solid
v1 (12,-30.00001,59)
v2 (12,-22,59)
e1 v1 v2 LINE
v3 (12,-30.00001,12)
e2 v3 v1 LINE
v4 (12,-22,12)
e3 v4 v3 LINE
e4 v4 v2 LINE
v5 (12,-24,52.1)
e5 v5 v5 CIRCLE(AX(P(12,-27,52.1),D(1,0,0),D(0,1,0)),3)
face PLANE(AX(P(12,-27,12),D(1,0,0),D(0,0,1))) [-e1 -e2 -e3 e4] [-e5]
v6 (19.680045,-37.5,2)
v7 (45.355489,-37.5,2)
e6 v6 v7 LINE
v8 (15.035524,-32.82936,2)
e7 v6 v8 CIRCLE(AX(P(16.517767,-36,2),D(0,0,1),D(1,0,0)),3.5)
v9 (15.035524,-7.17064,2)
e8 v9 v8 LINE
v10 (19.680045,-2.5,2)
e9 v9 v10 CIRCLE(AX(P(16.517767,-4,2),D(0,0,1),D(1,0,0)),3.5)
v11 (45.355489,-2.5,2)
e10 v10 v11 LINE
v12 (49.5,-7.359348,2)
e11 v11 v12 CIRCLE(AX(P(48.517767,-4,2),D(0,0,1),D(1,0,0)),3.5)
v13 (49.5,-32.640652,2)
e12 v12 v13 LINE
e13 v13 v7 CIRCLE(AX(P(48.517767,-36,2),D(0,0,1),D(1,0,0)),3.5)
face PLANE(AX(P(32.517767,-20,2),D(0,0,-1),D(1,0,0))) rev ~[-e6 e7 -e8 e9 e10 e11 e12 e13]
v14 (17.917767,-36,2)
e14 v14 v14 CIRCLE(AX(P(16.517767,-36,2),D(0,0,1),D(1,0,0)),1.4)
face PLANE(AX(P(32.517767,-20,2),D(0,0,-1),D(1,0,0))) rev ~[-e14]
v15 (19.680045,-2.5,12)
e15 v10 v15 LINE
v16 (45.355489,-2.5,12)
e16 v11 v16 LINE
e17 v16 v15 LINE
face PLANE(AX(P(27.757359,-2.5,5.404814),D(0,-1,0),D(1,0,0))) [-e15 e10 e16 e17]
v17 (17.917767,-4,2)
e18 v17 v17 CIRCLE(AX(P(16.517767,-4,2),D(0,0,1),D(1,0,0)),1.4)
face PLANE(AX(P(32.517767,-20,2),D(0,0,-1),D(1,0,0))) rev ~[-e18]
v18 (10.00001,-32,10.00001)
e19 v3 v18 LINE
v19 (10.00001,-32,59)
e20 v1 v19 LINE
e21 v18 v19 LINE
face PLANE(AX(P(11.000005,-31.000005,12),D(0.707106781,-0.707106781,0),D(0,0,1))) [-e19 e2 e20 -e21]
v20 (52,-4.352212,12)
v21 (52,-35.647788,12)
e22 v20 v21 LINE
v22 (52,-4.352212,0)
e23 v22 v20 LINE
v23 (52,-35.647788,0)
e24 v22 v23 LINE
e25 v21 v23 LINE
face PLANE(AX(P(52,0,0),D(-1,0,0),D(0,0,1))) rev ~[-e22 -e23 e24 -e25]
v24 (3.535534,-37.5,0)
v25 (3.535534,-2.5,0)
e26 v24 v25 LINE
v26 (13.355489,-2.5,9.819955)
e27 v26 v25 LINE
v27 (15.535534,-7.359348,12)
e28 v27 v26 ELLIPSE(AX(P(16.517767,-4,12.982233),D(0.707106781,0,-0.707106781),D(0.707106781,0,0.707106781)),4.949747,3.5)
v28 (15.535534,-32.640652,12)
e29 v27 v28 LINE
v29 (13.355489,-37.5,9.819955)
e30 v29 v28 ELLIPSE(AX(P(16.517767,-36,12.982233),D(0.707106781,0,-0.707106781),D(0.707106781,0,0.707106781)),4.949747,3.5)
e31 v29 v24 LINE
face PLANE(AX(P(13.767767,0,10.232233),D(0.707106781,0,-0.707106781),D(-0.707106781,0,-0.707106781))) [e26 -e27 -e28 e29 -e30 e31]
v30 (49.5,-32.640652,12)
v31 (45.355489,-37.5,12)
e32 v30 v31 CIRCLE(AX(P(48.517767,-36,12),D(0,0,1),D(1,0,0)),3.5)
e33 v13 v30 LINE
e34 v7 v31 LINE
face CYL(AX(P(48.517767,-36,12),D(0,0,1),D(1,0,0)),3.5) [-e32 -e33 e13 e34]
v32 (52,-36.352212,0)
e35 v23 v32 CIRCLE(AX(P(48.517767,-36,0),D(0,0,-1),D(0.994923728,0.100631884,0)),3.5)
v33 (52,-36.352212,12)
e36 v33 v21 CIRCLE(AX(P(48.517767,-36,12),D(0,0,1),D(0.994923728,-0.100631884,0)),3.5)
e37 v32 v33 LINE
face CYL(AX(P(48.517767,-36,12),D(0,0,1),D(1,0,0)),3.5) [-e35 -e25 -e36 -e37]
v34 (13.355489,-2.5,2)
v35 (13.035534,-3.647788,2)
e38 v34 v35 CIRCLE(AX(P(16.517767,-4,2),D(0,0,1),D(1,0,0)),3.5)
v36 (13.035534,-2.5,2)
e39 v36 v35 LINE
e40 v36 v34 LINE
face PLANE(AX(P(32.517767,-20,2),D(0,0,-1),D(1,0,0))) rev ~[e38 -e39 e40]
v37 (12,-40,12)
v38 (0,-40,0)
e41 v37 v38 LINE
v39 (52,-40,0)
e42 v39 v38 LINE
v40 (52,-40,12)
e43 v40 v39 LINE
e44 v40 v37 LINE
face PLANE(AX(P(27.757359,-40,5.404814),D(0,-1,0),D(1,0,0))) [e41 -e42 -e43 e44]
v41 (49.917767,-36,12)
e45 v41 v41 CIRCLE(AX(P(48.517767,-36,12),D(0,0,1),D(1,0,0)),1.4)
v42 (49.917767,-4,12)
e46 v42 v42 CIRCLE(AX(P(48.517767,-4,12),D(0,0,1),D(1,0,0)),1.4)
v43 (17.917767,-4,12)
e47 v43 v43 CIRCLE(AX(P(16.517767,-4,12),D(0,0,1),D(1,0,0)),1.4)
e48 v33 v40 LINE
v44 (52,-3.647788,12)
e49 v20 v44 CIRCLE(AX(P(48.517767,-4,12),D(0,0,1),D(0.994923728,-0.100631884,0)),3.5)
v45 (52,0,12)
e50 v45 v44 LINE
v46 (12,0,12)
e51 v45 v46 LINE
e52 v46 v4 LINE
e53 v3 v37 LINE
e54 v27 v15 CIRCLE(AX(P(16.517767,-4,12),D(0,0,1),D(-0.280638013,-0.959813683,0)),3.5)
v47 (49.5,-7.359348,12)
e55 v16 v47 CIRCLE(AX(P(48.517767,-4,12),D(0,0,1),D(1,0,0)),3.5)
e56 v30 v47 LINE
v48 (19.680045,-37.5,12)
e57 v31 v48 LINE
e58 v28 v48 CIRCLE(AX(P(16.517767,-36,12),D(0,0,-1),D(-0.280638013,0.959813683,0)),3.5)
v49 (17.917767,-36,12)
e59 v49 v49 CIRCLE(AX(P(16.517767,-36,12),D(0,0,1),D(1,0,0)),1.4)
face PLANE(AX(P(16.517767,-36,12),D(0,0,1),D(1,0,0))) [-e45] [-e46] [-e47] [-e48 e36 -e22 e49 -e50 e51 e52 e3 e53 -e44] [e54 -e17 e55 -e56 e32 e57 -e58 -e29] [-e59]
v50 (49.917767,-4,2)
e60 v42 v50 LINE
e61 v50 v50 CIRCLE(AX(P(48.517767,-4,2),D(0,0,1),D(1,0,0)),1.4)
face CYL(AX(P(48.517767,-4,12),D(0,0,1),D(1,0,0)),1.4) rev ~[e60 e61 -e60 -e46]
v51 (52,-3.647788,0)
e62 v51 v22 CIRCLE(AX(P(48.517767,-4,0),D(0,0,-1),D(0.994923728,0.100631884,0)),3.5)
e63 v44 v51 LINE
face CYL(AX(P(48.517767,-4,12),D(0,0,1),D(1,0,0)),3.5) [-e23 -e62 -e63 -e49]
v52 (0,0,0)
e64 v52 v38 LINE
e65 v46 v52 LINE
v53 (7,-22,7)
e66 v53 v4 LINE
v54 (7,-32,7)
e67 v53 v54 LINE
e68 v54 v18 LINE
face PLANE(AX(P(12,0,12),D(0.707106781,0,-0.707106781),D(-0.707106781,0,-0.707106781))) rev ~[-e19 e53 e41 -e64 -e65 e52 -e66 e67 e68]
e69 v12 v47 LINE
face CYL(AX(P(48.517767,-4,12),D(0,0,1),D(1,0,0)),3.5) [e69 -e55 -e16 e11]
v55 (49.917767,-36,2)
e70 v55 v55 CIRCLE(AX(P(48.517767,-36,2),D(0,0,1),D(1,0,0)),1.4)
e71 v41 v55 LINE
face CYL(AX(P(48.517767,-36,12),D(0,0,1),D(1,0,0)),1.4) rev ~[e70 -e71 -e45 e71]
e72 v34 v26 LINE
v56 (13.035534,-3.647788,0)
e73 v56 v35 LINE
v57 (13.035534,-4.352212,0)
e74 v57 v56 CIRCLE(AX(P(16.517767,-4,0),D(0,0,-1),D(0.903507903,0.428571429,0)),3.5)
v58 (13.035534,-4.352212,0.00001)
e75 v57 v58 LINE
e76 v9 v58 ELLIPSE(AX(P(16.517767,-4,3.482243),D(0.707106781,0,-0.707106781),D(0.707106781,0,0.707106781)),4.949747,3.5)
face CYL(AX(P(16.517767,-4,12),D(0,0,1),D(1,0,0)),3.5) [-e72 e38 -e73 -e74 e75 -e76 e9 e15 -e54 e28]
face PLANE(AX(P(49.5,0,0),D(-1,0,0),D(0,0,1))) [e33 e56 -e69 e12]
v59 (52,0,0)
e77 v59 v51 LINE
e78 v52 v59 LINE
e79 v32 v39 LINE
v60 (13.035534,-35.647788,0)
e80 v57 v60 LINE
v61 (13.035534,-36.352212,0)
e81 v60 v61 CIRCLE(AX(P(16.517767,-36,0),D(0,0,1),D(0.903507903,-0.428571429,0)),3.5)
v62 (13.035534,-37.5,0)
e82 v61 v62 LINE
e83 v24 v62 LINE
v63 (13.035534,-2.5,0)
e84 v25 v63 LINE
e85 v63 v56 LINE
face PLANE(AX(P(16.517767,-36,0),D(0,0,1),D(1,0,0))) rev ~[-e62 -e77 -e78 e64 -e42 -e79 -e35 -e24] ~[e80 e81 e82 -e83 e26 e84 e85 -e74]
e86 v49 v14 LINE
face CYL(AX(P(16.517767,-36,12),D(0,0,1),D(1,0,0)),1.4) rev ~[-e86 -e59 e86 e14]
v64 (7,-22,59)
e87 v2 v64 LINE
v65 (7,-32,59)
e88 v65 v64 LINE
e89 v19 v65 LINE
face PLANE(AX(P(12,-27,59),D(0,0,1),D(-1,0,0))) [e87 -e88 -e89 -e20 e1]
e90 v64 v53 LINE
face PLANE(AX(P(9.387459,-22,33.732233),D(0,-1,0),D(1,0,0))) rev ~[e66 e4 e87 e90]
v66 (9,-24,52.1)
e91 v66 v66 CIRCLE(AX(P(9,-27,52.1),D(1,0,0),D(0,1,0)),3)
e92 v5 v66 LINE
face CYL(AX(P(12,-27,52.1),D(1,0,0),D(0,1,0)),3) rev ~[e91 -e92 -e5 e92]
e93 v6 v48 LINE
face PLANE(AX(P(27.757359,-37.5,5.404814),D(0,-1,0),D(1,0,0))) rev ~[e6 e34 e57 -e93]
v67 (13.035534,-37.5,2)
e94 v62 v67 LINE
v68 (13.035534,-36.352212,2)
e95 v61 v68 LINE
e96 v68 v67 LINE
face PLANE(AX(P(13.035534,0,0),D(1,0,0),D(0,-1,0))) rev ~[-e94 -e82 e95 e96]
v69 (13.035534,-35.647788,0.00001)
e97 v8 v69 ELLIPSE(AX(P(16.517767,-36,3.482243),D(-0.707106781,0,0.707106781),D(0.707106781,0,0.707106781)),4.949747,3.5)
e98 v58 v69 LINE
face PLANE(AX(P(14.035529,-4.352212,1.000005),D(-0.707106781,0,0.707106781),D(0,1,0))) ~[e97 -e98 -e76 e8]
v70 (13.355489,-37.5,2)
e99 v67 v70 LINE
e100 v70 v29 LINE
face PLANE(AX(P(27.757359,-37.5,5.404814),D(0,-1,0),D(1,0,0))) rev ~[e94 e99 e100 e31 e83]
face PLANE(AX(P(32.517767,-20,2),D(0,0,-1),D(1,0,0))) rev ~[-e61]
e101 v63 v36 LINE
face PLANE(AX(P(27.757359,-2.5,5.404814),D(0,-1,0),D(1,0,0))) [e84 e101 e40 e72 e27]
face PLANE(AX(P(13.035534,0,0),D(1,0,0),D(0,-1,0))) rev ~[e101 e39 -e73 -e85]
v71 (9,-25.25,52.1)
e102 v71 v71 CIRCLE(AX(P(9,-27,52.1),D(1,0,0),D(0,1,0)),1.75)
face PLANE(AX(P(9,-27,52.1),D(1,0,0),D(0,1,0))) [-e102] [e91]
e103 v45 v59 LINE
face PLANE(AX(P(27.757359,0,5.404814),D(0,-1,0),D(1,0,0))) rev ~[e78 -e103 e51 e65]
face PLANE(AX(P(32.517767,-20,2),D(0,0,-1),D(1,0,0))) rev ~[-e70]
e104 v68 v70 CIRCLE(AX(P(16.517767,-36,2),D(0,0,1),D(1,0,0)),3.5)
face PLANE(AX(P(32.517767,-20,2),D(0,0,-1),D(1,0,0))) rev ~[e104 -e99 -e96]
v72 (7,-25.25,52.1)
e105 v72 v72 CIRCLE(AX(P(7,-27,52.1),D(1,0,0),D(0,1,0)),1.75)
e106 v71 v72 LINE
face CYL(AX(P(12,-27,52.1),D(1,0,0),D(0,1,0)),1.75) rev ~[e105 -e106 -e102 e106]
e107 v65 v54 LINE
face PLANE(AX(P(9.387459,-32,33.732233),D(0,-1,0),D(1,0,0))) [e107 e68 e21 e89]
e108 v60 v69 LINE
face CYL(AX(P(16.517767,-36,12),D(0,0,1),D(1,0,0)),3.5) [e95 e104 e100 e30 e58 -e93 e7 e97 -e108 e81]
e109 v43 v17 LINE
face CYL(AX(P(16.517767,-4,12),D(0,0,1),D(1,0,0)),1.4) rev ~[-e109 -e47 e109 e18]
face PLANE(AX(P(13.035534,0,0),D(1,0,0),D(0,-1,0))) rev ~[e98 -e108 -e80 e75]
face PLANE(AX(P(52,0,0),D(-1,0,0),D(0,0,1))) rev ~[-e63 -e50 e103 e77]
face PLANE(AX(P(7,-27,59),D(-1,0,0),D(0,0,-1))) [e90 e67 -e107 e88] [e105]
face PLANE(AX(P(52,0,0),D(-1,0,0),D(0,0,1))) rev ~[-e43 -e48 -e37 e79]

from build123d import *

# Parameters (mm, degrees)
F1_DEPTH  = 40
F2_T      = -2.5
F3_R      = 3.5
F4_DEPTH  = 12
F5_R      = 1.4
F6_DEPTH  = 12.001
F7_W      = 38.9644660941
F7_H      = 40
F8_DEPTH  = 2
F9_SIZE   = 1.99999
F12_DEPTH = 5
F13_R     = 1.75
F14_DEPTH = 12.001
F15_R     = 3
F16_DEPTH = 3
F17_SIZE  = 1.99999


# Not quite as in the source:
# - a fillet or chamfer is up to 0.001 mm smaller than in the source, because OpenCascade refuses the exact size


with BuildPart() as f1:
    # F0 (on Front) → F1 (new body)
    with BuildSketch(Plane.XZ):
        Polygon((12, 12), (0, 0), (52, 0), (52, 12), align=None)
    extrude(amount=F1_DEPTH)

    # F2
    f2_openings = [f1.faces().sort_by_distance(p)[0] for p in [
        (32, -20, 12),
        (26, -20, 0),
    ]]
    offset(amount=F2_T, openings=f2_openings, kind=Kind.INTERSECTION)

    # F3 (on face) → F4 (join, through all)
    with BuildSketch(Plane.XY.offset(12)):
        with Locations((16.517766953, -36)):
            Circle(F3_R)
        with Locations((48.517766953, -36)):
            Circle(F3_R)
        with Locations((48.517766953, -4)):
            Circle(F3_R)
        with Locations((16.517766953, -4)):
            Circle(F3_R)
    extrude(amount=-F4_DEPTH)

    # F5 (on face) → F6 (cut, through all)
    with BuildSketch(Plane.XY.offset(12)):
        with Locations((16.517766953, -4)):
            Circle(F5_R)
        with Locations((48.517766953, -4)):
            Circle(F5_R)
        with Locations((48.517766953, -36)):
            Circle(F5_R)
        with Locations((16.517766953, -36)):
            Circle(F5_R)
    extrude(amount=-F6_DEPTH, mode=Mode.SUBTRACT)

    # F7 (on face) → F8 (join)
    with BuildSketch(Plane(origin=(0, 0, 0), x_dir=(1, 0, 0), z_dir=(0, 0, -1))):
        with Locations((32.517766953, 20)):
            Rectangle(F7_W, F7_H)
    extrude(amount=-F8_DEPTH)

    # F9 (size 2 in the source; OpenCascade refuses exactly that, so slightly less here)
    f9_edges = [f1.edges().sort_by_distance(p)[0] for p in [
        (13.035534, -20, 2),
    ]]
    chamfer(f9_edges, length=F9_SIZE)

    # F11 (on offset) → F12 (join, symmetric)
    with BuildSketch(Plane.XZ.offset(27)):
        Polygon((7, 59), (7, 7), (12, 12), (12, 59), align=None)
    extrude(amount=F12_DEPTH, both=True)

    # F13 (on face) → F14 (cut, through all)
    with BuildSketch(Plane.YZ.offset(12)):
        with Locations((-27, 52.1)):
            Circle(F13_R)
    extrude(amount=-F14_DEPTH, mode=Mode.SUBTRACT)

    # F15 (on face) → F16 (cut)
    with BuildSketch(Plane.YZ.offset(12)):
        with Locations((-27, 52.1)):
            Circle(F15_R)
    extrude(amount=-F16_DEPTH, mode=Mode.SUBTRACT)

    # F17 (size 2 in the source; OpenCascade refuses exactly that, so slightly less here)
    f17_edges = [f1.edges().sort_by_distance(p)[0] for p in [
        (12, -32, 35.5),
    ]]
    chamfer(f17_edges, length=F17_SIZE)


solid = f1.part
